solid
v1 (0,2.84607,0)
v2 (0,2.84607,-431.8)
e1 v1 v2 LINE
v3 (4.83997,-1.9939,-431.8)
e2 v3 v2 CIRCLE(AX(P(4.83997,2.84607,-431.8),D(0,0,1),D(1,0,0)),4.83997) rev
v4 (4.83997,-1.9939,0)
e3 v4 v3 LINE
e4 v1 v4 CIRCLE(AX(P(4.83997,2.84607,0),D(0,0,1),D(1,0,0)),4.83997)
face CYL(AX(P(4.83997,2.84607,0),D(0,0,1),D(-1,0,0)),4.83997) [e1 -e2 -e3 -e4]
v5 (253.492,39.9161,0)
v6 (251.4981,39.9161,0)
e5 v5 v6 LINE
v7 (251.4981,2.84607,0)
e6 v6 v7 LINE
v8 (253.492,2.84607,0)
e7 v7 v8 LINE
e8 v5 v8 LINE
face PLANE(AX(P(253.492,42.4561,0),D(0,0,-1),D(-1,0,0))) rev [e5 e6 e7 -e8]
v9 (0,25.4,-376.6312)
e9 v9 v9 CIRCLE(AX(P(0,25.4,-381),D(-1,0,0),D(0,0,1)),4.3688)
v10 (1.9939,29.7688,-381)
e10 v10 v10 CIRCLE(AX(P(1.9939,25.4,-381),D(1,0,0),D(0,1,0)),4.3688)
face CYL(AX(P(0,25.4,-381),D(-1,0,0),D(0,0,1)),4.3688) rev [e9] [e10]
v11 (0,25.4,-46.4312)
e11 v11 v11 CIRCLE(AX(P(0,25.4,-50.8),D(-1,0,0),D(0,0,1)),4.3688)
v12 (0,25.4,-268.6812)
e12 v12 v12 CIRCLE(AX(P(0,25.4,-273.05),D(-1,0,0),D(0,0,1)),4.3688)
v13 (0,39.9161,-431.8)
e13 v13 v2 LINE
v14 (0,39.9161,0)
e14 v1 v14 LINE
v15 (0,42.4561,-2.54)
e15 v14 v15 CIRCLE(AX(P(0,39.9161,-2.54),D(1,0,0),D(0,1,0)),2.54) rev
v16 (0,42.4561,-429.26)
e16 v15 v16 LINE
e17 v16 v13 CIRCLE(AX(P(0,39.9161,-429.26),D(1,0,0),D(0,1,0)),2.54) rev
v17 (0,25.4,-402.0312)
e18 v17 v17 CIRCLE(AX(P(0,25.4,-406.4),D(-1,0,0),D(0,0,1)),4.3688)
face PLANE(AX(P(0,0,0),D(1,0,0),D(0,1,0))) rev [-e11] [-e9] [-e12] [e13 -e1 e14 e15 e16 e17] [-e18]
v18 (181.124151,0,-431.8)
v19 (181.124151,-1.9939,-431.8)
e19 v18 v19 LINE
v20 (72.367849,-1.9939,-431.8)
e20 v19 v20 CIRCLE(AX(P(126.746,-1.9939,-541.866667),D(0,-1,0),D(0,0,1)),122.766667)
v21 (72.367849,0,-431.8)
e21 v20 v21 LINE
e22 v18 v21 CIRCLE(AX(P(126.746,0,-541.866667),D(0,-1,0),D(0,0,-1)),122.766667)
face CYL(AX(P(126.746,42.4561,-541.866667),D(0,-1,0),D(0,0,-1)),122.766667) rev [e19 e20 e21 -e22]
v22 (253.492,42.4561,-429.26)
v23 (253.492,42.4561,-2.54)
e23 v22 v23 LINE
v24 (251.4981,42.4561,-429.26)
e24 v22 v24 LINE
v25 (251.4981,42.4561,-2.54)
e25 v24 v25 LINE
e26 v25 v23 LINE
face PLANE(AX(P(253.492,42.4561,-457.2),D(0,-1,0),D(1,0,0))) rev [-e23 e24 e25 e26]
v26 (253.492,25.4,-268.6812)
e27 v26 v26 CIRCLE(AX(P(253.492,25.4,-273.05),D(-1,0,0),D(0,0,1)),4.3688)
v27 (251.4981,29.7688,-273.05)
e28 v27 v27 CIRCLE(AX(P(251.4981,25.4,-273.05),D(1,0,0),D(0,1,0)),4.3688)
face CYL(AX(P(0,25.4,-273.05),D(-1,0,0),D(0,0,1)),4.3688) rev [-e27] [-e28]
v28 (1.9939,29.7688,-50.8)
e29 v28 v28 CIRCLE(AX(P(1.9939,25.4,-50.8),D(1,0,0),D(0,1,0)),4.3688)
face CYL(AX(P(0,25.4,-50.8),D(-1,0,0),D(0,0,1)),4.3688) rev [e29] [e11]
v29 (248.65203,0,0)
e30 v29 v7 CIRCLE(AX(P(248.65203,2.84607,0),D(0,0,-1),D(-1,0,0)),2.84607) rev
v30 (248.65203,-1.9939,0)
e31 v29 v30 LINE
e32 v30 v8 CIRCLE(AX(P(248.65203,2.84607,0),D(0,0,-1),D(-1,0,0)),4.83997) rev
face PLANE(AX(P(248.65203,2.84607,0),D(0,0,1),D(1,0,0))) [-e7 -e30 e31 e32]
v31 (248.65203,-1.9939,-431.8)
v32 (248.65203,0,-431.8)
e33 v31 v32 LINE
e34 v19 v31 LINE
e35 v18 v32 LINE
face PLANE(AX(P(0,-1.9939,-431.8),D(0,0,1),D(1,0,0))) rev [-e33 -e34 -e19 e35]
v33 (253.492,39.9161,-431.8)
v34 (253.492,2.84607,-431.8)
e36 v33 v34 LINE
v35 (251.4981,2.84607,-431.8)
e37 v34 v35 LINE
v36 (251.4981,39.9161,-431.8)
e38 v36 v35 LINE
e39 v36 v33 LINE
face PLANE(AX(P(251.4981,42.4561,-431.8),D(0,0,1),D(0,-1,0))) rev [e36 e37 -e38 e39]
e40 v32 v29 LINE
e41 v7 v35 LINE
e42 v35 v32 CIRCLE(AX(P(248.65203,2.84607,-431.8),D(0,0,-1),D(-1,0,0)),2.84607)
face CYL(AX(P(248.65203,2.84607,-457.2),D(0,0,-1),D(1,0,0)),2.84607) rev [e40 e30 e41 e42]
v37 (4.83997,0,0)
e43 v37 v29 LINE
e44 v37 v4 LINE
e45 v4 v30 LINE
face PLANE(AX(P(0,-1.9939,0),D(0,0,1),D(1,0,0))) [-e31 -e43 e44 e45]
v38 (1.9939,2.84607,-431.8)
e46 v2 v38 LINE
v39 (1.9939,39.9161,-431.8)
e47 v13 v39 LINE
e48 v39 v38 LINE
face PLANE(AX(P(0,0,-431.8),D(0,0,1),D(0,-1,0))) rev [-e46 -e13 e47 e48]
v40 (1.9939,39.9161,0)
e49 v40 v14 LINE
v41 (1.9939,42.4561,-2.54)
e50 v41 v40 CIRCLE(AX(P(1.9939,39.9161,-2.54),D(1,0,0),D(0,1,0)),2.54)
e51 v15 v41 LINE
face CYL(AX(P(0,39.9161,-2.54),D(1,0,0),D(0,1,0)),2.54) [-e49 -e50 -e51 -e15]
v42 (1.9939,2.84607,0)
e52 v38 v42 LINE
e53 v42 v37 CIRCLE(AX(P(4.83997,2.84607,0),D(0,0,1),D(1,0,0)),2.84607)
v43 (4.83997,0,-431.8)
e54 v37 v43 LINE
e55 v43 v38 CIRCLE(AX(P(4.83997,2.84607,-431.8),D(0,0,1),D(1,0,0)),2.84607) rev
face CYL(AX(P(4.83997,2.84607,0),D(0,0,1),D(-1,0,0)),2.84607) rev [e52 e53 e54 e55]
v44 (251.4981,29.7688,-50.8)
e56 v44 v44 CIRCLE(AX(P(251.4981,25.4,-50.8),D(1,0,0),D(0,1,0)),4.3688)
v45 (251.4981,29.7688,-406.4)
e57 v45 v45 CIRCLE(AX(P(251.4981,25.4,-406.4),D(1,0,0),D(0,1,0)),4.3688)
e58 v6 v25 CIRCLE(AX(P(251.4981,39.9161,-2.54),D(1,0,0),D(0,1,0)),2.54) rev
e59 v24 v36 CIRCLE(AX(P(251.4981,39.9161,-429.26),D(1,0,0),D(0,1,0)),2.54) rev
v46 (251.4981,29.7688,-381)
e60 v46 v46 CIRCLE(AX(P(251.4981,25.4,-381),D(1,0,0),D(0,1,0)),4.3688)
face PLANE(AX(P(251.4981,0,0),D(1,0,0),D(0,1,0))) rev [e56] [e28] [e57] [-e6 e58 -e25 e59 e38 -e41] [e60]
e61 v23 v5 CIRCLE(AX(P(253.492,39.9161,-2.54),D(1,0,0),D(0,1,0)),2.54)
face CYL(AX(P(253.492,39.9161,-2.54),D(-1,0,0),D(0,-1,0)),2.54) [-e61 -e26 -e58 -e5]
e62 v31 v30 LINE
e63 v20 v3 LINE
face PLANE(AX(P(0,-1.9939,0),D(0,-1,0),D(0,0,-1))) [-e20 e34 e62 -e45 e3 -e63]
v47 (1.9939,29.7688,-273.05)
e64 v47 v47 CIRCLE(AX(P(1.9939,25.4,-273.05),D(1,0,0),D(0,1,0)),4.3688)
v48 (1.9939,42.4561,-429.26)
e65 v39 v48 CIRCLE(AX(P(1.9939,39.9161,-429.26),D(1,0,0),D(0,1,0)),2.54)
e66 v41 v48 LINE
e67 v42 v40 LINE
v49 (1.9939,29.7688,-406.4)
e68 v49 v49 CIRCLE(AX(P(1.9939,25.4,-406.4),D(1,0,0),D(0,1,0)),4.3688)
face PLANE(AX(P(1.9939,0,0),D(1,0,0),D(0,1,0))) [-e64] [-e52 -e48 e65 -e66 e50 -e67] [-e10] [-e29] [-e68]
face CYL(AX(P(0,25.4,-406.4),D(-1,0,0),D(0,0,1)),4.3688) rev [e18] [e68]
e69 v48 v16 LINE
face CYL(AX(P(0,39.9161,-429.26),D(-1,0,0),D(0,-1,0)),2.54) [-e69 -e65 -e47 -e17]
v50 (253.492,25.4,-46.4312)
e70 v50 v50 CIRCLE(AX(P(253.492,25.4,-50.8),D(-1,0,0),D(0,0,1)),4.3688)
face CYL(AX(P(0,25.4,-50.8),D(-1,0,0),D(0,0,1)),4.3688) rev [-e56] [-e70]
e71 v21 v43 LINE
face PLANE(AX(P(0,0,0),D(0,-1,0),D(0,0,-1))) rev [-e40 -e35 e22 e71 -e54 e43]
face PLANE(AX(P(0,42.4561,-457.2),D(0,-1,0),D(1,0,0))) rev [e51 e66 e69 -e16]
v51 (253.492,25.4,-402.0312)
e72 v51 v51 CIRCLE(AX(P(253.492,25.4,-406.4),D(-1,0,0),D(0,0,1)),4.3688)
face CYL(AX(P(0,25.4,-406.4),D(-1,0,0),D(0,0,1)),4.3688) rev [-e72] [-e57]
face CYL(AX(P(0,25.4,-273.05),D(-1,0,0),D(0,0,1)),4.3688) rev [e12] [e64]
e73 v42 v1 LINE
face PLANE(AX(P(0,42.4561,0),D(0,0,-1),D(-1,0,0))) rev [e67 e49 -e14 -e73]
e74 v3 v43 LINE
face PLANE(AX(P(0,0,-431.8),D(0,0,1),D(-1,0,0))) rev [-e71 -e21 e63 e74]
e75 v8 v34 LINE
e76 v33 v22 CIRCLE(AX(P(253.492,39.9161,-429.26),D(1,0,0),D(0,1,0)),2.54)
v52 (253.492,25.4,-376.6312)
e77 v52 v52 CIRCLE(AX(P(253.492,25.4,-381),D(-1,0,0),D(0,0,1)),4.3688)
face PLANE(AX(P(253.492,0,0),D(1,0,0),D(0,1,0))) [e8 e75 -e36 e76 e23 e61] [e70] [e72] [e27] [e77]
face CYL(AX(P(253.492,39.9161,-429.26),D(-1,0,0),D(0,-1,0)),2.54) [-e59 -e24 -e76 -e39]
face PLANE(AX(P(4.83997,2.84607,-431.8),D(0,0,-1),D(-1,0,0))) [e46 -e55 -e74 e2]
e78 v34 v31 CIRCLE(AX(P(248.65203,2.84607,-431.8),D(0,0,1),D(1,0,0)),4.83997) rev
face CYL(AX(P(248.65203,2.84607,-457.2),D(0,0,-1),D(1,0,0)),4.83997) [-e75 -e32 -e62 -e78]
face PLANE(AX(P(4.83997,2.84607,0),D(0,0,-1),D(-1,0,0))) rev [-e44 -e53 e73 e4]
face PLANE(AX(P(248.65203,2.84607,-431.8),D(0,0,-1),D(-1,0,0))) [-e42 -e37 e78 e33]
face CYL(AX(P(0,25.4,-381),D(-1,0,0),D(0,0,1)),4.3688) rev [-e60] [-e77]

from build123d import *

# Parameters (mm, degrees)
SKETCH1_W                                 = 253.492
SKETCH1_H                                 = 457.2
BASE_FLANGE1_DEPTH                        = 1.9939
EDGE_FLANGE1_STRIP_W                      = 13.66774
EDGE_FLANGE1_STRIP_H                      = 1.9939
EDGE_FLANGE1_STRIP_CUT_DEPTH              = 457.2
EDGE_FLANGE1_STRIP_2_W                    = 13.66774
EDGE_FLANGE1_STRIP_2_H                    = 1.9939
EDGE_FLANGE1_STRIP_CUT_2_DEPTH            = 457.2
EDGE_FLANGE1_DEPTH                        = 457.2
EDGE_FLANGE1_BEND_DEPTH                   = 457.2
HOLE_FOR_1_4_SELF_CLINCHING_NUTS_S_SS_C_D = 8.7376
CUT_EXTRUDE1_DEPTH                        = 525.657828078
SKETCH16_W                                = 253.492
SKETCH16_H                                = 25.4
CUT_EXTRUDE2_DEPTH                        = 525.657828078
FILLET1_R                                 = 2.54


# Sheet-metal steps are written as plain solids
with BuildPart() as part:
    # Sketch1 → Base-Flange1 (new body)
    with BuildSketch(Plane(origin=(0, 0, 0), x_dir=(1, 0, 0), z_dir=(0, 1, 0))):
        with Locations((126.746, 228.6)):
            Rectangle(SKETCH1_W, SKETCH1_H)
    extrude(amount=-BASE_FLANGE1_DEPTH)

    # Edge-Flange1 strip (across the edge) → Edge-Flange1 strip cut (cut)
    with BuildSketch(Plane.XY.offset(-457.2)):
        with Locations((-1.9939, -0.99695)):
            Rectangle(EDGE_FLANGE1_STRIP_W, EDGE_FLANGE1_STRIP_H)
    extrude(amount=EDGE_FLANGE1_STRIP_CUT_DEPTH, mode=Mode.SUBTRACT)

    # Edge-Flange1 strip 2 (across the edge) → Edge-Flange1 strip cut 2 (cut)
    with BuildSketch(Plane(origin=(253.492, 0, 0), x_dir=(-1, 0, 0), z_dir=(0, 0, -1))):
        with Locations((-1.9939, -0.99695)):
            Rectangle(EDGE_FLANGE1_STRIP_2_W, EDGE_FLANGE1_STRIP_2_H)
    extrude(amount=EDGE_FLANGE1_STRIP_CUT_2_DEPTH, mode=Mode.SUBTRACT)

    # Edge-Flange1 section (across the edge) → Edge-Flange1 (add)
    with BuildSketch(Plane.XY.offset(-457.2)):
        with BuildLine():
            Line((0, 2.84607), (0, 42.4561))
            Line((0, 42.4561), (1.9939, 42.4561))
            Line((1.9939, 42.4561), (1.9939, 2.84607))
            ThreePointArc((1.9939, 2.84607), (2.827494603, 0.833594603), (4.83997, 0))
            Line((4.83997, 0), (4.83997, -1.9939))
            ThreePointArc((4.83997, -1.9939), (1.417594392, -0.576305608), (0, 2.84607))
        make_face()
    extrude(amount=EDGE_FLANGE1_DEPTH)

    # Edge-Flange1 section 2 (across the edge) → Edge-Flange1 bend (add)
    with BuildSketch(Plane(origin=(253.492, 0, 0), x_dir=(-1, 0, 0), z_dir=(0, 0, -1))):
        with BuildLine():
            Line((0, 2.84607), (0, 42.4561))
            Line((0, 42.4561), (1.9939, 42.4561))
            Line((1.9939, 42.4561), (1.9939, 2.84607))
            ThreePointArc((1.9939, 2.84607), (2.827494603, 0.833594603), (4.83997, 0))
            Line((4.83997, 0), (4.83997, -1.9939))
            ThreePointArc((4.83997, -1.9939), (1.417594392, -0.576305608), (0, 2.84607))
        make_face()
    extrude(amount=EDGE_FLANGE1_BEND_DEPTH)

    # Hole for 1/4 Self-clinching Nuts (S,SS,CLS,CLSS)1 (through all)
    with Locations(Plane.ZY):
        with Locations((-406.4, 25.4), (-50.8, 25.4), (-381, 25.4), (-273.05, 25.4)):
            Hole(HOLE_FOR_1_4_SELF_CLINCHING_NUTS_S_SS_C_D / 2)

    # Sketch15 → Cut-Extrude1 (cut, through all)
    with BuildSketch(Plane.XZ.offset(1.9939)):
        with BuildLine():
            Line((215.646, -457.2), (37.846, -457.2))
            ThreePointArc((37.846, -457.2), (126.746, -419.1), (215.646, -457.2))
        make_face()
    extrude(amount=-CUT_EXTRUDE1_DEPTH, mode=Mode.SUBTRACT)

    # Sketch16 → Cut-Extrude2 (cut, through all)
    with BuildSketch(Plane.XZ.offset(1.9939)):
        with Locations((126.746, -444.5)):
            Rectangle(SKETCH16_W, SKETCH16_H)
    extrude(amount=-CUT_EXTRUDE2_DEPTH, mode=Mode.SUBTRACT)

    # Fillet1
    fillet1_edges = [part.edges().sort_by_distance(p)[0] for p in [
        (0.99695, 42.4561, -431.8),
        (252.49505, 42.4561, -431.8),
        (0.99695, 42.4561, 0),
        (252.49505, 42.4561, 0),
    ]]
    fillet(fillet1_edges, radius=FILLET1_R)


solid = part.part
